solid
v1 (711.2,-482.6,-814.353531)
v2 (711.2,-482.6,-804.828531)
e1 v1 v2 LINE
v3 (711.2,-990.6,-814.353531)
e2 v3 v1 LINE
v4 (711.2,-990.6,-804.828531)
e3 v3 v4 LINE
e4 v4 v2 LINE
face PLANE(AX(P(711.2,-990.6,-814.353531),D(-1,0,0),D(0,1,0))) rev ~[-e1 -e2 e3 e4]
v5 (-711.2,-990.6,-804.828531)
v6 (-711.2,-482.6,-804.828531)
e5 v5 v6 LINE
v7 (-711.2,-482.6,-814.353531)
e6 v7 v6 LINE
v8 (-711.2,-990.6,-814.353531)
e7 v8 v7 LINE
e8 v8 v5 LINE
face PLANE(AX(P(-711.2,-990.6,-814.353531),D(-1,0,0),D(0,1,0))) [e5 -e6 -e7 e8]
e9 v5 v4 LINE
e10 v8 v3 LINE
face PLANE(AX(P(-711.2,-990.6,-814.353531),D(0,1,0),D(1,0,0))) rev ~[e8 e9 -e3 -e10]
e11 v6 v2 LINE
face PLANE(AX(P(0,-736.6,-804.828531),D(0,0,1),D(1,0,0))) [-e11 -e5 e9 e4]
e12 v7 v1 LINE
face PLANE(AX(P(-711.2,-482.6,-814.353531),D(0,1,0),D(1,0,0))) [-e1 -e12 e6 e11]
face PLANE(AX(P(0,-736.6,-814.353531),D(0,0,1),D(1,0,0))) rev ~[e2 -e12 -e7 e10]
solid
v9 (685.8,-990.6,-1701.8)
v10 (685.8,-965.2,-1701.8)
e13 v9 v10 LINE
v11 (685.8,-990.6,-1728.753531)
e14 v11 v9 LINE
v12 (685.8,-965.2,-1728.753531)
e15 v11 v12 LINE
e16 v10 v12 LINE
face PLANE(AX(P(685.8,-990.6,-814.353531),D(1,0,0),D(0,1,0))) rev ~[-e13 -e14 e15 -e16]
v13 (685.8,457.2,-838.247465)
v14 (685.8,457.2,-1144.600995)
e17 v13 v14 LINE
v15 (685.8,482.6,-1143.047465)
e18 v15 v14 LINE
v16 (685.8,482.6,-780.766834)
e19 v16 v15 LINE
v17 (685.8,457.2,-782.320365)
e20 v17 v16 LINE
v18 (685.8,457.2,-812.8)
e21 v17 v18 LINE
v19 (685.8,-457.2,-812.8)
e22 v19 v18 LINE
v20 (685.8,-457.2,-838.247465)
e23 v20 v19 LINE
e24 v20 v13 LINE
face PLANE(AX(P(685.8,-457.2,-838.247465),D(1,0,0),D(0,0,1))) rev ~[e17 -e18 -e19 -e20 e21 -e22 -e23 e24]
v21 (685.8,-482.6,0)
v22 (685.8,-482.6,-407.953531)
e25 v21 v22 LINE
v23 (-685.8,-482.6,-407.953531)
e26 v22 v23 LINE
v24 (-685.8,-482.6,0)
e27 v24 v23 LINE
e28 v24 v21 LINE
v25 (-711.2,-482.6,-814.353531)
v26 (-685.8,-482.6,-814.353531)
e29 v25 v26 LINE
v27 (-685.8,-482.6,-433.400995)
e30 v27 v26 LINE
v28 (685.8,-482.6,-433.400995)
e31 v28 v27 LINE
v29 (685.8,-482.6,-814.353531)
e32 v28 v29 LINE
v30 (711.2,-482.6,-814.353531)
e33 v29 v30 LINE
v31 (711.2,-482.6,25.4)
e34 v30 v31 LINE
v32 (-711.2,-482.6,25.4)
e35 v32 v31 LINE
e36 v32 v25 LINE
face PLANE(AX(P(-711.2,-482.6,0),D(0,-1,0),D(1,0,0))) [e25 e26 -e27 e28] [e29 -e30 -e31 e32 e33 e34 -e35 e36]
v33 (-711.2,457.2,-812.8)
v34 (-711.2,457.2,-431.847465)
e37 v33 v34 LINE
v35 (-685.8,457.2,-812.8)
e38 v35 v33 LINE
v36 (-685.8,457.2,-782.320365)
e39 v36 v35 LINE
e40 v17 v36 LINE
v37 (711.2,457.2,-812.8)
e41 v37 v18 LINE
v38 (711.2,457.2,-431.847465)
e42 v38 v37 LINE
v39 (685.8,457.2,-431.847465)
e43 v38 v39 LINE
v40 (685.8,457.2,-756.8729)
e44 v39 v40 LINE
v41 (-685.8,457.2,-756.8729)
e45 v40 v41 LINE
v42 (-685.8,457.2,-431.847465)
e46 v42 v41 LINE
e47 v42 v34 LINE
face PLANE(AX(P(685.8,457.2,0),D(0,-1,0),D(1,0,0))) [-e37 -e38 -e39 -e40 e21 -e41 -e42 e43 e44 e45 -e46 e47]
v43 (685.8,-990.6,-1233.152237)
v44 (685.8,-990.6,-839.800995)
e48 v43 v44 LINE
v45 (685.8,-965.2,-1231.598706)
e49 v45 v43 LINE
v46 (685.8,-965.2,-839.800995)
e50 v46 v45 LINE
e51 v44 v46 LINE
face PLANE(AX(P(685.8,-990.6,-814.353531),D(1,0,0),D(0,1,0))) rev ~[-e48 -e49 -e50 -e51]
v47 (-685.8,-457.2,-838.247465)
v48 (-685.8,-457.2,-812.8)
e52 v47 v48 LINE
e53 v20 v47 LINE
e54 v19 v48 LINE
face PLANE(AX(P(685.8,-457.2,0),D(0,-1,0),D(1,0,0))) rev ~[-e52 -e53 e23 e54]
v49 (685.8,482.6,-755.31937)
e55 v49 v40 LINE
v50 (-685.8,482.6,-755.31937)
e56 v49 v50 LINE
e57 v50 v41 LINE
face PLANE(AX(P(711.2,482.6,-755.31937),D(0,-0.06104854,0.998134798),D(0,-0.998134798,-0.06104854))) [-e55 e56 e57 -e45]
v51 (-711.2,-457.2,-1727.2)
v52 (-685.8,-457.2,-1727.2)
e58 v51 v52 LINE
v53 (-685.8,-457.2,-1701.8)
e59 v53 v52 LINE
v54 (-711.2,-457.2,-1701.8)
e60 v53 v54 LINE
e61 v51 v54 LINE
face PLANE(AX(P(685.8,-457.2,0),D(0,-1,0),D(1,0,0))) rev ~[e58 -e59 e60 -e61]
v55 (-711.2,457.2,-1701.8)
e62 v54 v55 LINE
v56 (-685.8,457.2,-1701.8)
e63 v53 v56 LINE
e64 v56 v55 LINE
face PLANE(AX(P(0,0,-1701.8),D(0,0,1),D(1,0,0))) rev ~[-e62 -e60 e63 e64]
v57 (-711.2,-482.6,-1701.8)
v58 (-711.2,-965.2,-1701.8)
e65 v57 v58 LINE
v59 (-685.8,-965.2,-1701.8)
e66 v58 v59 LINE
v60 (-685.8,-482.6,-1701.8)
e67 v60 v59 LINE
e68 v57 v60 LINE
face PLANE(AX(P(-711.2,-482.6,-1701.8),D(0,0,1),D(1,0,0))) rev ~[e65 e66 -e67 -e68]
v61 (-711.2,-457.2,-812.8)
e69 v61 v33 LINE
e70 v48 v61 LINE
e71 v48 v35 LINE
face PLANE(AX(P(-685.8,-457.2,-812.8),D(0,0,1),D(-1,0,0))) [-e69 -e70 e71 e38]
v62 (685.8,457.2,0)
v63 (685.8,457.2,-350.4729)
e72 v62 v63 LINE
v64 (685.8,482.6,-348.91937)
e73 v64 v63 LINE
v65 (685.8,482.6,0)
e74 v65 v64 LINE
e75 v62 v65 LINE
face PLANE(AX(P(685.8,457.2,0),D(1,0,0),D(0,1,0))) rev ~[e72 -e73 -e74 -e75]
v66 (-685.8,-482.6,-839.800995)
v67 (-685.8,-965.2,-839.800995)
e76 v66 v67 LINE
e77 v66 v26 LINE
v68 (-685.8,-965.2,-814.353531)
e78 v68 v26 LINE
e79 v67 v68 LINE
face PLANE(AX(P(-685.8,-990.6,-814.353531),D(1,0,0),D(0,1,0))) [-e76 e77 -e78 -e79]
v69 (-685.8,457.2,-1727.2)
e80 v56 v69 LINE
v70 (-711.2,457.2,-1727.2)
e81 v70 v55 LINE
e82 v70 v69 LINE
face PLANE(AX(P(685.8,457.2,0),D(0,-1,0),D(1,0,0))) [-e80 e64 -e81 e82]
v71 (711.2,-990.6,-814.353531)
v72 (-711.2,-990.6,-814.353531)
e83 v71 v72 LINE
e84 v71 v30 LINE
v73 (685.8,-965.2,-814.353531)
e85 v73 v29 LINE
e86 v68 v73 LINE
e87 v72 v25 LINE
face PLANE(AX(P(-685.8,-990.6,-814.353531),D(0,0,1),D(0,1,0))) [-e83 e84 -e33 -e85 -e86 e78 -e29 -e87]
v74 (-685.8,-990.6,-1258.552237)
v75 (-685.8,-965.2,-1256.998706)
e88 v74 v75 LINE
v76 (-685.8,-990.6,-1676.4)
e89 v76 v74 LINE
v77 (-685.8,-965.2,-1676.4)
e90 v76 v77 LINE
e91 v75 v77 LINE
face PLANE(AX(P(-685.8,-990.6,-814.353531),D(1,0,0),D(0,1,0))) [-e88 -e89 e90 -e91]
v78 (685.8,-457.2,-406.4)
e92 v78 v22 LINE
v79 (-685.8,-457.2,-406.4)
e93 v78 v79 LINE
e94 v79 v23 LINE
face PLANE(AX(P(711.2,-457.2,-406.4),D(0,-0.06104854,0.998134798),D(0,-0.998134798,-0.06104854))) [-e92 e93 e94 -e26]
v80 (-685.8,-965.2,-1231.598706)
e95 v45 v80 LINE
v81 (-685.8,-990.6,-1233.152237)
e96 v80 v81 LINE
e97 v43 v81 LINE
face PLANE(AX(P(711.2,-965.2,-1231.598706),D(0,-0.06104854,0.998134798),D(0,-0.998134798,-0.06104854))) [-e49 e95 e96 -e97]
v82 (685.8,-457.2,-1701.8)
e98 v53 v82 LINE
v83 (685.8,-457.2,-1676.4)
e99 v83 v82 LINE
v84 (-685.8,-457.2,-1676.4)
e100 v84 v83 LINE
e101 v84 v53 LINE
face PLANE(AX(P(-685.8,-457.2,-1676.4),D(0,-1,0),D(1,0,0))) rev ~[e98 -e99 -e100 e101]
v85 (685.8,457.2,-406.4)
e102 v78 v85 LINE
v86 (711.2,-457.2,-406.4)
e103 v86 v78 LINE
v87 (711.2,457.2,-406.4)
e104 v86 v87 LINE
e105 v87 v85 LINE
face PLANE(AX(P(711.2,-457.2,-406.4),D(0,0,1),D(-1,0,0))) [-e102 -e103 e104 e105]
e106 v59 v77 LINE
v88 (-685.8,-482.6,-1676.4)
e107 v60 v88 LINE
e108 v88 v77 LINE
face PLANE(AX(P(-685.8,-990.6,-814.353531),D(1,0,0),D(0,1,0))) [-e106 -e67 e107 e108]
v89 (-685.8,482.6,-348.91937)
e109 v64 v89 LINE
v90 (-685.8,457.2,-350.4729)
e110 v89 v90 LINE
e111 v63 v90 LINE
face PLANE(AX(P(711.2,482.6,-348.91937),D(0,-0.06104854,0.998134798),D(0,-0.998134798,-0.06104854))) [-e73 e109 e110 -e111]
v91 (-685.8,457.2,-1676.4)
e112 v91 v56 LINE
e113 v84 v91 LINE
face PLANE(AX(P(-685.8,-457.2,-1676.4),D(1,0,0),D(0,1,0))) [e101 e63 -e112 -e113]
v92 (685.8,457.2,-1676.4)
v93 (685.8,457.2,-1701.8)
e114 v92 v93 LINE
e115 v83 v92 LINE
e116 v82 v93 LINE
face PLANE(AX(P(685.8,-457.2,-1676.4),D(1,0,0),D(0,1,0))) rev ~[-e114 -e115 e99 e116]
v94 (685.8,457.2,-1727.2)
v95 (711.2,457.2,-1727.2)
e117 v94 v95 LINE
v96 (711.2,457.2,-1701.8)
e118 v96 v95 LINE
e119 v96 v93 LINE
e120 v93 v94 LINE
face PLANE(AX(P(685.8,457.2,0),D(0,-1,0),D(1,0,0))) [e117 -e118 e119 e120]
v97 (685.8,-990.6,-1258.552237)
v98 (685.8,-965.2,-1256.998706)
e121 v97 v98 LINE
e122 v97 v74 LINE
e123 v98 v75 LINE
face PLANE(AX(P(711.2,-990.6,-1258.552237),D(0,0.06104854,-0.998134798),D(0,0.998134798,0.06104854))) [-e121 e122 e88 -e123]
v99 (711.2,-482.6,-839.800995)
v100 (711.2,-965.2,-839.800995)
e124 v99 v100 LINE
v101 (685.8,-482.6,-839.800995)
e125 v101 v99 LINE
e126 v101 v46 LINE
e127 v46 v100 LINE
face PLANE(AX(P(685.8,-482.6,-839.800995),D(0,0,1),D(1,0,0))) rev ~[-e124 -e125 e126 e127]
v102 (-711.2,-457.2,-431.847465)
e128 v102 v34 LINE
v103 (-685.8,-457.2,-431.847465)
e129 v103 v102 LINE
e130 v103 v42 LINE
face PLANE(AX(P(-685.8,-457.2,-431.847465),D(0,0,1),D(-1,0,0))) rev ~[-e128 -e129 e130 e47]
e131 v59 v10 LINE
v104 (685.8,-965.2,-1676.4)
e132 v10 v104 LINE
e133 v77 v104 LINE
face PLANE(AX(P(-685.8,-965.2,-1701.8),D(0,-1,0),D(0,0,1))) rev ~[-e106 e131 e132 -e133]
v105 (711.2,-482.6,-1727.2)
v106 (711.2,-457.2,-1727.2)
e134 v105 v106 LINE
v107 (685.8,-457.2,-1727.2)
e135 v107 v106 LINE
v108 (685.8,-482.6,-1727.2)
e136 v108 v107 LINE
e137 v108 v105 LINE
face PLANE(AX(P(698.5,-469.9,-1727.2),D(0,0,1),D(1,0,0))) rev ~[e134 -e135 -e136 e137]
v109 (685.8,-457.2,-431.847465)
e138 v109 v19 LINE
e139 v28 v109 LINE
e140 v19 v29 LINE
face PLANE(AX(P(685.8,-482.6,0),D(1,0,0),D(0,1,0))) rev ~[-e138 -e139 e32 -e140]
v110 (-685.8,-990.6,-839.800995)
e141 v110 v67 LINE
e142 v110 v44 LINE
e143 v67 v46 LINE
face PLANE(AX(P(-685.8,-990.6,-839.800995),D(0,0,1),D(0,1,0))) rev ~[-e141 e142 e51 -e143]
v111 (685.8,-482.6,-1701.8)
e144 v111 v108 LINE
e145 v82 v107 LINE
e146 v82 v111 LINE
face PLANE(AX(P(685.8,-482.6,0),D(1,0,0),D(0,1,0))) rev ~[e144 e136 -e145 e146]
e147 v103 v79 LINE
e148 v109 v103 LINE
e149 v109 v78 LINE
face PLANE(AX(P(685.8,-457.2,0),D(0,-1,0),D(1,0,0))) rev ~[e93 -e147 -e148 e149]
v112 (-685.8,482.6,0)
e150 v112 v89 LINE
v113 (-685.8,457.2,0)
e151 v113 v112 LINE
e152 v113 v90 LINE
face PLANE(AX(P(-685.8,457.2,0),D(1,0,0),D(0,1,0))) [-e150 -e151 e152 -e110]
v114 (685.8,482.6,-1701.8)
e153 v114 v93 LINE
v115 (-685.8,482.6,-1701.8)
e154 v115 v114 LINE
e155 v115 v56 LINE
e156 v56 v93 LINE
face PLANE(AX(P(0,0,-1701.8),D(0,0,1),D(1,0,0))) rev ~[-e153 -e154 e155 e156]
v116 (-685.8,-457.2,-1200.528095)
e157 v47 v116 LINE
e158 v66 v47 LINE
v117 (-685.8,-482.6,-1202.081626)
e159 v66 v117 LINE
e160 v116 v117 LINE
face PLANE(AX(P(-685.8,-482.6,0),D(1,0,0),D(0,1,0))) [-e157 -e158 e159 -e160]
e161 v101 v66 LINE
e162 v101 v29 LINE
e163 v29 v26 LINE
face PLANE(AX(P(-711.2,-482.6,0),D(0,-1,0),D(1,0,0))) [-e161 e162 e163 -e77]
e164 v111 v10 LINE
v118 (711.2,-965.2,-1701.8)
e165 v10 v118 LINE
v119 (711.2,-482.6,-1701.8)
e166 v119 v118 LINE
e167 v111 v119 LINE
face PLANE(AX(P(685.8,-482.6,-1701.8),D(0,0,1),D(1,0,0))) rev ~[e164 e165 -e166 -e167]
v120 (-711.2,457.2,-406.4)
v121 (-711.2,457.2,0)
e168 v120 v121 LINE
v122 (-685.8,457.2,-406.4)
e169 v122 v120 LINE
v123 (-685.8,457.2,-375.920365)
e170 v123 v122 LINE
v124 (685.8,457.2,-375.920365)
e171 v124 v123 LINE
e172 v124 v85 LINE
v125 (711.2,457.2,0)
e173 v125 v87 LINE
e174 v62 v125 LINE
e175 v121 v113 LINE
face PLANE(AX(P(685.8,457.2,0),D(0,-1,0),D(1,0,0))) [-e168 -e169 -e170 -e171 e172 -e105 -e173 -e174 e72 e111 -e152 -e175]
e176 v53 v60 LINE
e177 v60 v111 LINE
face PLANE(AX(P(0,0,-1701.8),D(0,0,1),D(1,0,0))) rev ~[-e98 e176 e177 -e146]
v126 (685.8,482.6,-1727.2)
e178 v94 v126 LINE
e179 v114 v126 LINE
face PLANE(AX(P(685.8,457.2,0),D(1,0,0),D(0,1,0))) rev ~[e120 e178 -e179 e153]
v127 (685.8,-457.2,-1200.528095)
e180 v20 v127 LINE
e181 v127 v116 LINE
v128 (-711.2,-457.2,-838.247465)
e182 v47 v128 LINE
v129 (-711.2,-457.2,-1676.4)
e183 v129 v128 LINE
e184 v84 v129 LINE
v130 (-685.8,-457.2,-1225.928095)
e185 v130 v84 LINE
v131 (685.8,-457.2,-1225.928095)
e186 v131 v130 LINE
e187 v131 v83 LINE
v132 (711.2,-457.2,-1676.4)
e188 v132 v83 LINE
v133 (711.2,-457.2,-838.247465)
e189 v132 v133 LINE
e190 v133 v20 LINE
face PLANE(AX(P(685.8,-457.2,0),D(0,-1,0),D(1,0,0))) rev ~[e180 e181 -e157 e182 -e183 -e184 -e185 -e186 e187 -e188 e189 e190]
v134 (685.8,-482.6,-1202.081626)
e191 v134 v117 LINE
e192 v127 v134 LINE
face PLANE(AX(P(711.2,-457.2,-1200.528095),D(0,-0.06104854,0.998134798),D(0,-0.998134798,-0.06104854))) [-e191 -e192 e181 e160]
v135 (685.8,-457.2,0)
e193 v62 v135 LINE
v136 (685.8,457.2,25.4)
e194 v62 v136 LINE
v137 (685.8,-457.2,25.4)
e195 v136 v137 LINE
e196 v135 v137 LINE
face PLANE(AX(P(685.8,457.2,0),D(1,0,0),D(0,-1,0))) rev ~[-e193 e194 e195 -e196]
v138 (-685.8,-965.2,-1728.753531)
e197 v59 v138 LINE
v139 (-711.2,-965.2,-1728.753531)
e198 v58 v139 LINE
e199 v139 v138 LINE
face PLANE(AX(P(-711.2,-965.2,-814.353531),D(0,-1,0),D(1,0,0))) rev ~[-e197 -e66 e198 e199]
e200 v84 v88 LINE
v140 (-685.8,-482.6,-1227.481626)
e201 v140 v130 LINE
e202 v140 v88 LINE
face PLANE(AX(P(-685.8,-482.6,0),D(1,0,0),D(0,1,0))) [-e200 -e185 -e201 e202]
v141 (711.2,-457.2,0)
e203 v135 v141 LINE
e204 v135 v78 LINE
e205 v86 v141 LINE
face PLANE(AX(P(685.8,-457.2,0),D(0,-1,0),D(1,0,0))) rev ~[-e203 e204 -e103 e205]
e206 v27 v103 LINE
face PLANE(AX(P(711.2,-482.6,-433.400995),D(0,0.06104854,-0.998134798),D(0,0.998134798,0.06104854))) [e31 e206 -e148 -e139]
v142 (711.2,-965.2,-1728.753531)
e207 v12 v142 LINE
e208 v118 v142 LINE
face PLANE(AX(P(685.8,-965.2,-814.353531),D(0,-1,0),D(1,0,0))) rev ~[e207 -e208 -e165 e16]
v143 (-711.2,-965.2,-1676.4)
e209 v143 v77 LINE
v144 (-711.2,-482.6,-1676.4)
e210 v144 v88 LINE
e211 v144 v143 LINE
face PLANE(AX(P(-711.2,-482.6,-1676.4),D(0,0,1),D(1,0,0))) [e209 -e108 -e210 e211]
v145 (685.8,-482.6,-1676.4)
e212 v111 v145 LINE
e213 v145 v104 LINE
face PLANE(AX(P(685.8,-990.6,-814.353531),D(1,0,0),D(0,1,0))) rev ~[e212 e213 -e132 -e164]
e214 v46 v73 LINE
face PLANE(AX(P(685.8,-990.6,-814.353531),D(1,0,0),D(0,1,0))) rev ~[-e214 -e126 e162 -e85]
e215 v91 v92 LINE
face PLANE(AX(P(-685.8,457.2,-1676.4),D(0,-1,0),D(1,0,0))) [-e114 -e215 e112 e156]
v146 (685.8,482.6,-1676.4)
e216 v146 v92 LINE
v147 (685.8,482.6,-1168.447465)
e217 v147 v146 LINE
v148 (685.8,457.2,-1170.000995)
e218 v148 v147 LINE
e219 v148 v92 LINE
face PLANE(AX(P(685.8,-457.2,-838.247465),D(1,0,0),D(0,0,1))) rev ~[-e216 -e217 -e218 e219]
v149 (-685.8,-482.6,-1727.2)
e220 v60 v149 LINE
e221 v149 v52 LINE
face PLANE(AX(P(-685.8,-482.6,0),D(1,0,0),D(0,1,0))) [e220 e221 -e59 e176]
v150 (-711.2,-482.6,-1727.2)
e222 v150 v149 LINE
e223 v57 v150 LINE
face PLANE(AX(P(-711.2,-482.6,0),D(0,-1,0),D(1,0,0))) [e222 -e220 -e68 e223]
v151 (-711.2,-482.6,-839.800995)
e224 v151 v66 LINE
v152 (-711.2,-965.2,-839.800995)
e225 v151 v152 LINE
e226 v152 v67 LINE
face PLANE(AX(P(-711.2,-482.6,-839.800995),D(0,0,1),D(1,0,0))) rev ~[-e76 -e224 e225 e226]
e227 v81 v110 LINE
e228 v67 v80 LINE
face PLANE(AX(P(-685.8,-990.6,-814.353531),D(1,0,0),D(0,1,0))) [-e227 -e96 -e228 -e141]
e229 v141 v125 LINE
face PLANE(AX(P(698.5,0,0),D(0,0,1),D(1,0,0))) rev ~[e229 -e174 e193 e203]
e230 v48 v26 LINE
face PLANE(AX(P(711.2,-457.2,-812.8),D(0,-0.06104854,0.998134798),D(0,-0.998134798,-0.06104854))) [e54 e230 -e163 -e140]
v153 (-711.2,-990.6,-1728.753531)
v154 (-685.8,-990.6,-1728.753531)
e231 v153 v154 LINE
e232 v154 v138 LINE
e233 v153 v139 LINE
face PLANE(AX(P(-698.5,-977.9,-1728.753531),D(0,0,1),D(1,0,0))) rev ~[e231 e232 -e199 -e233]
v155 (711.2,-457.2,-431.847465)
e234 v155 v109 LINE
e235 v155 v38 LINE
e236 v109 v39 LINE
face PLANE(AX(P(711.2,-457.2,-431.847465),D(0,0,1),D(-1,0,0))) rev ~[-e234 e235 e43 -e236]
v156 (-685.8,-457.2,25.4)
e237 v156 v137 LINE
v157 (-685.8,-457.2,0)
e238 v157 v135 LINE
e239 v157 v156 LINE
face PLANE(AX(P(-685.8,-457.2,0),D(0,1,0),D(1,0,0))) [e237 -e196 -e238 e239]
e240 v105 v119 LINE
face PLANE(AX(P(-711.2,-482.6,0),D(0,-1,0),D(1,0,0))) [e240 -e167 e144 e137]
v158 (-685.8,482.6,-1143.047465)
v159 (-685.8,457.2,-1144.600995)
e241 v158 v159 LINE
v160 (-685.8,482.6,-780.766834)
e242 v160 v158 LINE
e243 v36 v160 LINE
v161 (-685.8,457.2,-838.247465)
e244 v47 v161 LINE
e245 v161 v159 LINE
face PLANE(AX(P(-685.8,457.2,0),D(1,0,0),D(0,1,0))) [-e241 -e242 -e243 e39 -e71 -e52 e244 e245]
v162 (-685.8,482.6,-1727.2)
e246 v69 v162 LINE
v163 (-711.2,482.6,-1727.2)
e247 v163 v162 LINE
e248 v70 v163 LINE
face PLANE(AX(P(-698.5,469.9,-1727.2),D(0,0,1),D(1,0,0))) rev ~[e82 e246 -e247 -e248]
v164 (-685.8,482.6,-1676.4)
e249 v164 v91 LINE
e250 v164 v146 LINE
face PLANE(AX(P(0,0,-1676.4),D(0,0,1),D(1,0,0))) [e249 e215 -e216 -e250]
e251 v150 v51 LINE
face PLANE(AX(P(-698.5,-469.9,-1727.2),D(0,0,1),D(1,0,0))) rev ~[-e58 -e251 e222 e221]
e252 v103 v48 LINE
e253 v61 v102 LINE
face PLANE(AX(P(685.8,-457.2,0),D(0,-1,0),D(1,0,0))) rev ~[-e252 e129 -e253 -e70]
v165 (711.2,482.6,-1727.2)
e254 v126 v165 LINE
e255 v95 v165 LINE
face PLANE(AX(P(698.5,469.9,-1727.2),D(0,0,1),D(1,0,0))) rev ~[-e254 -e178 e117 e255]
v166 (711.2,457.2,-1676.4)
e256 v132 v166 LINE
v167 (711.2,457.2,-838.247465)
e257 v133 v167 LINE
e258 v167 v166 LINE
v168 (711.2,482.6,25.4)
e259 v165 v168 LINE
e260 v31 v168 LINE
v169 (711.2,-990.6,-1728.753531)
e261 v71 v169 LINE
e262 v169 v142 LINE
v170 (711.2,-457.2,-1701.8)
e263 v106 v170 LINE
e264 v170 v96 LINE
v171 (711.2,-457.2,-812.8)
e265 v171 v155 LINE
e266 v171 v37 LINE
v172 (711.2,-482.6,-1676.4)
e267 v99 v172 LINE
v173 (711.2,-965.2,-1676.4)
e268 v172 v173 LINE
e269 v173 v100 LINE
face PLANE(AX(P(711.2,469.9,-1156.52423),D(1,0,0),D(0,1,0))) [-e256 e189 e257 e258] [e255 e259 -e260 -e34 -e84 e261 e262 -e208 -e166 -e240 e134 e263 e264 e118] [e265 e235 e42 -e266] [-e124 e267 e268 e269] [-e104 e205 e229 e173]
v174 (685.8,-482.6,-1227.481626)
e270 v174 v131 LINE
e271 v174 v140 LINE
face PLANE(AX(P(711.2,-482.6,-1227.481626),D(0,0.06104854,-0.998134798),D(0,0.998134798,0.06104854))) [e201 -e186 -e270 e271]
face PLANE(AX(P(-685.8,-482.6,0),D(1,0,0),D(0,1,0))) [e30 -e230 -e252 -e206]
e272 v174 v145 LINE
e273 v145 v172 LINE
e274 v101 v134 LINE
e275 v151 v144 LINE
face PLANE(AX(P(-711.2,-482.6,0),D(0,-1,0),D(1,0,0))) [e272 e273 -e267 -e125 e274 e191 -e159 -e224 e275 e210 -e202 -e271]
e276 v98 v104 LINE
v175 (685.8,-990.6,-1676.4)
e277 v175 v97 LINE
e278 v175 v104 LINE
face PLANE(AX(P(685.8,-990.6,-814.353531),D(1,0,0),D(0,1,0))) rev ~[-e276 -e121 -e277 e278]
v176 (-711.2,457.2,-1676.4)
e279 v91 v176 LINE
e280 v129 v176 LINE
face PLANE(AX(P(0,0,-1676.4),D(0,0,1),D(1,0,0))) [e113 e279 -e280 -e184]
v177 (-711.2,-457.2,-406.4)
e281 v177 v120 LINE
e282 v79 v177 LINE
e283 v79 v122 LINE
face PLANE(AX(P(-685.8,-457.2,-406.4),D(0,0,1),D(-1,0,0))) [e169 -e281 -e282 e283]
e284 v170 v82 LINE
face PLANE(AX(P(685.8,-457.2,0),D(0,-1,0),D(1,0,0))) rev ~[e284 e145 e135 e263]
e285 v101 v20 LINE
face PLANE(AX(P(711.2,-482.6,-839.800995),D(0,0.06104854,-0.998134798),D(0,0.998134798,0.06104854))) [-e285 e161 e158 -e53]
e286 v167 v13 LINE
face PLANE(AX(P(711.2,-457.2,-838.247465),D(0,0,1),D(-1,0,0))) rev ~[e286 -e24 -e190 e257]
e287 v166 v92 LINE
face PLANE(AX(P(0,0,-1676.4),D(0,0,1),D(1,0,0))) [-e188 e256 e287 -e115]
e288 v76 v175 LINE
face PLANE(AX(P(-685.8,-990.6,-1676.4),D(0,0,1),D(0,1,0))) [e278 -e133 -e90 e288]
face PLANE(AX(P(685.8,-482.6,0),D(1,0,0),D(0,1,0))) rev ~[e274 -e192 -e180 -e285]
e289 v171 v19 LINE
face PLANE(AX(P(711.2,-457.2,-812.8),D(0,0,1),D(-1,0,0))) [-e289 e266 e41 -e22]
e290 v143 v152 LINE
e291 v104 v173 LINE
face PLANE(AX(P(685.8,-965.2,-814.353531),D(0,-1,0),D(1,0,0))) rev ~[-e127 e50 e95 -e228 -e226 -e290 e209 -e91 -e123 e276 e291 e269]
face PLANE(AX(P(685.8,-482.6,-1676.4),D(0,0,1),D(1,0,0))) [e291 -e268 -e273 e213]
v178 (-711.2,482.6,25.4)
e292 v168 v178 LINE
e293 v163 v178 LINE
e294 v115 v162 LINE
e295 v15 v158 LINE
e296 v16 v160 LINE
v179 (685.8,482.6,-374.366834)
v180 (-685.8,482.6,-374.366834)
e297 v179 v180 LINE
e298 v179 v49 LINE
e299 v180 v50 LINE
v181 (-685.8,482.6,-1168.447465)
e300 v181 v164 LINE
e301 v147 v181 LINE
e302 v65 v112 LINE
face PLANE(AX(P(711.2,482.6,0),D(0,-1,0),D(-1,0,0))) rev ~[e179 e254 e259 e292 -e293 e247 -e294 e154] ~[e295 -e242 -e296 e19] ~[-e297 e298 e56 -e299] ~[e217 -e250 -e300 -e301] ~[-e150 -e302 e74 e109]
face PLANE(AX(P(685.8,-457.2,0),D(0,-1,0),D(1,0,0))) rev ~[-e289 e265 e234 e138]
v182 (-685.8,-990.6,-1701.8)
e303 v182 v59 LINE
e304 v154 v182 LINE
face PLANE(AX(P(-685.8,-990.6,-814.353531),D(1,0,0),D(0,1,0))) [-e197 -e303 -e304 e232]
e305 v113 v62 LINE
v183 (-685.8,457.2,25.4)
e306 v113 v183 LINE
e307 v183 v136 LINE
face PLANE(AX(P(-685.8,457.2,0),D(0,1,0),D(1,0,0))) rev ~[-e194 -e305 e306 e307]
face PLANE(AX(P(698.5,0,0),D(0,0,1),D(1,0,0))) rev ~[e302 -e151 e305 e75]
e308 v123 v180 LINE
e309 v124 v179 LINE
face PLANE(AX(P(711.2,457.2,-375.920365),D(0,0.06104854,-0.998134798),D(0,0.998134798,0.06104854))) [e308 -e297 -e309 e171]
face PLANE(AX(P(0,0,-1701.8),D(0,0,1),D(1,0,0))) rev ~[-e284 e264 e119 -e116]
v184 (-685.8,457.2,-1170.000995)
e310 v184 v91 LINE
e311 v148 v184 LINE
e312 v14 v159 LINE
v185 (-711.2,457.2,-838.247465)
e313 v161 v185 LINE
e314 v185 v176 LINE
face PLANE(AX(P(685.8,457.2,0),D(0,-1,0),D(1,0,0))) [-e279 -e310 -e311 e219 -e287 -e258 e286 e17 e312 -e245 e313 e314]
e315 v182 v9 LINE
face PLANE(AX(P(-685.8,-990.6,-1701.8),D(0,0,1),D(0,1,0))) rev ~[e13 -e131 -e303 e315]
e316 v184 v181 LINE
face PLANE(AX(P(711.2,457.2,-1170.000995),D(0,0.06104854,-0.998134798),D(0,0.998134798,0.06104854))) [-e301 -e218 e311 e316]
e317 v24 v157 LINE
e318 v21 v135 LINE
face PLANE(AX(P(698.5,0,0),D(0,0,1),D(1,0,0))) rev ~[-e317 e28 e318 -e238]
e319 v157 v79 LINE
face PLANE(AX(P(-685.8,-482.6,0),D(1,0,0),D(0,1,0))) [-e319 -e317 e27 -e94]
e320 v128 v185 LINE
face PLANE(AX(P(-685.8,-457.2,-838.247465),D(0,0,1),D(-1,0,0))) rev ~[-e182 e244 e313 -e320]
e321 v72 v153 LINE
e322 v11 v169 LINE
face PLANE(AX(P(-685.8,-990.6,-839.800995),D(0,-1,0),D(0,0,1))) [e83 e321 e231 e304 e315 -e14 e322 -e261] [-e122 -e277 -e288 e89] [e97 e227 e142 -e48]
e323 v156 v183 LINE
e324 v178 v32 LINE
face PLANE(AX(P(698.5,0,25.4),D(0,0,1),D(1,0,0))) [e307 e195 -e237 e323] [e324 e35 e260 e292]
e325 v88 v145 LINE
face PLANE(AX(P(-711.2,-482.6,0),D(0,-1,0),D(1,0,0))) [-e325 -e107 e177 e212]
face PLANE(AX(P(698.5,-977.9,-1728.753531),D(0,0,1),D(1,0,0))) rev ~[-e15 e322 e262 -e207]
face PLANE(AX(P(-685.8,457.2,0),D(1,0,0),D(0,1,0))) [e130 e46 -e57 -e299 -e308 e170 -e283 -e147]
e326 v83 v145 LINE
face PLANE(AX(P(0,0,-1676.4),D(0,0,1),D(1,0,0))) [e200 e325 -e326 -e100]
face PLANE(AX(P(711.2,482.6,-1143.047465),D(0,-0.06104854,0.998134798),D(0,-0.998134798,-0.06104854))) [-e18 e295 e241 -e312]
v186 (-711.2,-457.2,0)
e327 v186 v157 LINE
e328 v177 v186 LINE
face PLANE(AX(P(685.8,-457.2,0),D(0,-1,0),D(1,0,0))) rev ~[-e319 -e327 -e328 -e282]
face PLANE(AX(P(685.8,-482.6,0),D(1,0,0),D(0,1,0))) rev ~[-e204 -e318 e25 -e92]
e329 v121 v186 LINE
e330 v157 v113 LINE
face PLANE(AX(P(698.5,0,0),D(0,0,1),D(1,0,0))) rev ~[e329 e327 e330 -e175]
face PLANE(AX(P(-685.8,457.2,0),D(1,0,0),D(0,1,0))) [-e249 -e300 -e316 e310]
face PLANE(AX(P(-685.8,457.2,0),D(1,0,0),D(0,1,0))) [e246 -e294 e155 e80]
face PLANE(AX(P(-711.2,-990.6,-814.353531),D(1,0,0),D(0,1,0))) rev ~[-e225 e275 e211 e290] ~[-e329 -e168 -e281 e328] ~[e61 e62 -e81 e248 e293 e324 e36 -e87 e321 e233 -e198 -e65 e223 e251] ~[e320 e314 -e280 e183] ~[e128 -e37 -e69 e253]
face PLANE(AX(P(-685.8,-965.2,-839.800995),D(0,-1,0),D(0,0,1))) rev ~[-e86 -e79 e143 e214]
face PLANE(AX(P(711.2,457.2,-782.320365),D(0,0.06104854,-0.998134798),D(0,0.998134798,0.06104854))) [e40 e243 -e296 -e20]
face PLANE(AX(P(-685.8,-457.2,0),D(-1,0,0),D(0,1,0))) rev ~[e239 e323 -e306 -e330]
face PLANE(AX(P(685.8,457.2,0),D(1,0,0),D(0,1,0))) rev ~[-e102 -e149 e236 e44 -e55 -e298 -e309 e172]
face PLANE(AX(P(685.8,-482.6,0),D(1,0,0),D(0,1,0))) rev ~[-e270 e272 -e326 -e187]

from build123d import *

# Parameters (mm, degrees)
F0_W      = 25.4
F0_H      = 914.4
F0_H_2    = 25.4
F0_W_2    = 1371.6
F1_DEPTH  = 25.4
F2_DEPTH  = 1727.2
F4_DEPTH  = 1422.4
F6_W      = 1422.4
F6_H      = 965.2
F6_W_2    = 1371.6
F6_H_2    = 914.4
F7_DEPTH  = 25.4
F8_W      = 25.4
F8_H      = 25.4474646512
F9_DEPTH  = 914.4
F10_W     = 25.4
F10_H     = 25.4474646512
F10_H_2   = 25.4
F11_DEPTH = 508
F12_W     = 25.4
F12_H     = 25.4
F13_DEPTH = 914.4
F14_W     = 25.4
F14_H     = 25.4
F15_DEPTH = 914.4
F16_W     = 25.4
F16_H     = 25.4474646512
F16_H_2   = 25.4
F17_DEPTH = 1371.6
F18_W     = 1422.4
F18_H     = 508
F19_DEPTH = 9.525
F21_DEPTH = 1422.4


# Not quite as in the source:
# - a feature names something its author has since deleted; it is built from what else it names


with BuildPart() as f1:
    # F0 (on Top) → F1 (new body)
    with BuildSketch(Plane.XY):
        with Locations((698.5, 0)):
            Rectangle(F0_W, F0_H)
        with Locations((698.5, 469.9)):
            Rectangle(F0_W, F0_H_2)
        with Locations((0, 469.9)):
            Rectangle(F0_W_2, F0_H_2)
        with Locations((-698.5, 0)):
            Rectangle(F0_W, F0_H)
        with Locations((-698.5, 469.9)):
            Rectangle(F0_W, F0_H_2)
        with Locations((0, -469.9)):
            Rectangle(F0_W_2, F0_H_2)
        with Locations((698.5, -469.9)):
            Rectangle(F0_W, F0_H_2)
        with Locations((-698.5, -469.9)):
            Rectangle(F0_W, F0_H_2)
    extrude(amount=F1_DEPTH)

    # F0 (on Top) → F2 (join)
    with BuildSketch(Plane.XY):
        with Locations((-698.5, -469.9)):
            Rectangle(F0_W, F0_H_2)
        with Locations((-698.5, 469.9)):
            Rectangle(F0_W, F0_H_2)
        with Locations((698.5, 469.9)):
            Rectangle(F0_W, F0_H_2)
        with Locations((698.5, -469.9)):
            Rectangle(F0_W, F0_H_2)
    extrude(amount=-F2_DEPTH)

    # F3 (on face) → F4 (join)
    with BuildSketch(Plane.YZ.offset(711.2)):
        Polygon((-457.2, -431.8474646512), (-457.2, -406.4), (-482.6, -407.9535305518), (-482.6, -433.400995203), align=None)
        Polygon((482.6, -348.9193695826), (457.2, -350.4729001344), (457.2, -375.9203647856), (482.6, -374.3668342338), align=None)
        Polygon((482.6, -755.3193695826), (457.2, -756.8729001344), (457.2, -782.3203647856), (482.6, -780.7668342338), align=None)
        Polygon((-457.2, -838.2474646512), (-457.2, -812.8), (-482.6, -814.3535305518), (-482.6, -839.800995203), align=None)
    extrude(amount=-F4_DEPTH)

    # F6 (on offset) → F7 (join)
    with BuildSketch(Plane.XY.offset(-1676.4)):
        Rectangle(F6_W, F6_H)
        Rectangle(F6_W_2, F6_H_2, mode=Mode.SUBTRACT)
    extrude(amount=-F7_DEPTH)

    # F8 (on face) → F9 (join)
    with BuildSketch(Plane(origin=(0, -457.2, 0), x_dir=(-1, 0, 0), z_dir=(0, 1, 0))):
        with Locations((-698.5, -825.5237323256)):
            Rectangle(F8_W, F8_H)
        with Locations((698.5, -825.5237323256)):
            Rectangle(F8_W, F8_H)
        with Locations((-698.5, -419.1237323256)):
            Rectangle(F8_W, F8_H)
        with Locations((698.5, -419.1237323256)):
            Rectangle(F8_W, F8_H)
    extrude(amount=F9_DEPTH)

    # F10 (on face) → F11 (join)
    with BuildSketch(Plane.XZ.offset(482.6)):
        with Locations((-698.5, -827.0772628774)):
            Rectangle(F10_W, F10_H)
        with Locations((698.5, -827.0772628774)):
            Rectangle(F10_W, F10_H)
        with Locations((-698.5, -1689.1)):
            Rectangle(F10_W, F10_H_2)
        with Locations((698.5, -1689.1)):
            Rectangle(F10_W, F10_H_2)
    extrude(amount=F11_DEPTH)

    # F12 (on face) → F13 (join)
    with BuildSketch(Plane.XY.offset(-814.3535305518)):
        with Locations((-698.5, -977.9)):
            Rectangle(F12_W, F12_H)
    extrude(amount=-F13_DEPTH)

    # F14 (on face) → F15 (join)
    with BuildSketch(Plane.XY.offset(-814.3535305518)):
        with Locations((698.5, -977.9)):
            Rectangle(F14_W, F14_H)
    extrude(amount=-F15_DEPTH)

    # F16 (on face) → F17 (join)
    with BuildSketch(Plane.YZ.offset(-685.8)):
        with Locations((-977.9, -827.0772628774)):
            Rectangle(F16_W, F16_H)
        with Locations((-977.9, -1689.1)):
            Rectangle(F16_W, F16_H_2)
    extrude(amount=F17_DEPTH)

    # F20 (on face) → F21 (join)
    with BuildSketch(Plane.YZ.offset(711.2)):
        Polygon((482.6, -1168.4474646512), (482.6, -1143.0474646512), (457.2, -1144.600995203), (457.2, -1170.000995203), align=None)
        Polygon((-457.2, -1225.9280950687), (-457.2, -1200.5280950687), (-482.6, -1202.0816256205), (-482.6, -1227.4816256205), align=None)
        Polygon((-965.2, -1256.9987061051), (-965.2, -1231.5987061051), (-990.6, -1233.1522366569), (-990.6, -1258.5522366569), align=None)
    extrude(amount=-F21_DEPTH)


with BuildPart() as f19:
    # F18 (on face) → F19 (new body)
    with BuildSketch(Plane.XY.offset(-814.3535305518)):
        with Locations((0, -736.6)):
            Rectangle(F18_W, F18_H)
    extrude(amount=F19_DEPTH)


solid = Compound([f1.part, f19.part])
